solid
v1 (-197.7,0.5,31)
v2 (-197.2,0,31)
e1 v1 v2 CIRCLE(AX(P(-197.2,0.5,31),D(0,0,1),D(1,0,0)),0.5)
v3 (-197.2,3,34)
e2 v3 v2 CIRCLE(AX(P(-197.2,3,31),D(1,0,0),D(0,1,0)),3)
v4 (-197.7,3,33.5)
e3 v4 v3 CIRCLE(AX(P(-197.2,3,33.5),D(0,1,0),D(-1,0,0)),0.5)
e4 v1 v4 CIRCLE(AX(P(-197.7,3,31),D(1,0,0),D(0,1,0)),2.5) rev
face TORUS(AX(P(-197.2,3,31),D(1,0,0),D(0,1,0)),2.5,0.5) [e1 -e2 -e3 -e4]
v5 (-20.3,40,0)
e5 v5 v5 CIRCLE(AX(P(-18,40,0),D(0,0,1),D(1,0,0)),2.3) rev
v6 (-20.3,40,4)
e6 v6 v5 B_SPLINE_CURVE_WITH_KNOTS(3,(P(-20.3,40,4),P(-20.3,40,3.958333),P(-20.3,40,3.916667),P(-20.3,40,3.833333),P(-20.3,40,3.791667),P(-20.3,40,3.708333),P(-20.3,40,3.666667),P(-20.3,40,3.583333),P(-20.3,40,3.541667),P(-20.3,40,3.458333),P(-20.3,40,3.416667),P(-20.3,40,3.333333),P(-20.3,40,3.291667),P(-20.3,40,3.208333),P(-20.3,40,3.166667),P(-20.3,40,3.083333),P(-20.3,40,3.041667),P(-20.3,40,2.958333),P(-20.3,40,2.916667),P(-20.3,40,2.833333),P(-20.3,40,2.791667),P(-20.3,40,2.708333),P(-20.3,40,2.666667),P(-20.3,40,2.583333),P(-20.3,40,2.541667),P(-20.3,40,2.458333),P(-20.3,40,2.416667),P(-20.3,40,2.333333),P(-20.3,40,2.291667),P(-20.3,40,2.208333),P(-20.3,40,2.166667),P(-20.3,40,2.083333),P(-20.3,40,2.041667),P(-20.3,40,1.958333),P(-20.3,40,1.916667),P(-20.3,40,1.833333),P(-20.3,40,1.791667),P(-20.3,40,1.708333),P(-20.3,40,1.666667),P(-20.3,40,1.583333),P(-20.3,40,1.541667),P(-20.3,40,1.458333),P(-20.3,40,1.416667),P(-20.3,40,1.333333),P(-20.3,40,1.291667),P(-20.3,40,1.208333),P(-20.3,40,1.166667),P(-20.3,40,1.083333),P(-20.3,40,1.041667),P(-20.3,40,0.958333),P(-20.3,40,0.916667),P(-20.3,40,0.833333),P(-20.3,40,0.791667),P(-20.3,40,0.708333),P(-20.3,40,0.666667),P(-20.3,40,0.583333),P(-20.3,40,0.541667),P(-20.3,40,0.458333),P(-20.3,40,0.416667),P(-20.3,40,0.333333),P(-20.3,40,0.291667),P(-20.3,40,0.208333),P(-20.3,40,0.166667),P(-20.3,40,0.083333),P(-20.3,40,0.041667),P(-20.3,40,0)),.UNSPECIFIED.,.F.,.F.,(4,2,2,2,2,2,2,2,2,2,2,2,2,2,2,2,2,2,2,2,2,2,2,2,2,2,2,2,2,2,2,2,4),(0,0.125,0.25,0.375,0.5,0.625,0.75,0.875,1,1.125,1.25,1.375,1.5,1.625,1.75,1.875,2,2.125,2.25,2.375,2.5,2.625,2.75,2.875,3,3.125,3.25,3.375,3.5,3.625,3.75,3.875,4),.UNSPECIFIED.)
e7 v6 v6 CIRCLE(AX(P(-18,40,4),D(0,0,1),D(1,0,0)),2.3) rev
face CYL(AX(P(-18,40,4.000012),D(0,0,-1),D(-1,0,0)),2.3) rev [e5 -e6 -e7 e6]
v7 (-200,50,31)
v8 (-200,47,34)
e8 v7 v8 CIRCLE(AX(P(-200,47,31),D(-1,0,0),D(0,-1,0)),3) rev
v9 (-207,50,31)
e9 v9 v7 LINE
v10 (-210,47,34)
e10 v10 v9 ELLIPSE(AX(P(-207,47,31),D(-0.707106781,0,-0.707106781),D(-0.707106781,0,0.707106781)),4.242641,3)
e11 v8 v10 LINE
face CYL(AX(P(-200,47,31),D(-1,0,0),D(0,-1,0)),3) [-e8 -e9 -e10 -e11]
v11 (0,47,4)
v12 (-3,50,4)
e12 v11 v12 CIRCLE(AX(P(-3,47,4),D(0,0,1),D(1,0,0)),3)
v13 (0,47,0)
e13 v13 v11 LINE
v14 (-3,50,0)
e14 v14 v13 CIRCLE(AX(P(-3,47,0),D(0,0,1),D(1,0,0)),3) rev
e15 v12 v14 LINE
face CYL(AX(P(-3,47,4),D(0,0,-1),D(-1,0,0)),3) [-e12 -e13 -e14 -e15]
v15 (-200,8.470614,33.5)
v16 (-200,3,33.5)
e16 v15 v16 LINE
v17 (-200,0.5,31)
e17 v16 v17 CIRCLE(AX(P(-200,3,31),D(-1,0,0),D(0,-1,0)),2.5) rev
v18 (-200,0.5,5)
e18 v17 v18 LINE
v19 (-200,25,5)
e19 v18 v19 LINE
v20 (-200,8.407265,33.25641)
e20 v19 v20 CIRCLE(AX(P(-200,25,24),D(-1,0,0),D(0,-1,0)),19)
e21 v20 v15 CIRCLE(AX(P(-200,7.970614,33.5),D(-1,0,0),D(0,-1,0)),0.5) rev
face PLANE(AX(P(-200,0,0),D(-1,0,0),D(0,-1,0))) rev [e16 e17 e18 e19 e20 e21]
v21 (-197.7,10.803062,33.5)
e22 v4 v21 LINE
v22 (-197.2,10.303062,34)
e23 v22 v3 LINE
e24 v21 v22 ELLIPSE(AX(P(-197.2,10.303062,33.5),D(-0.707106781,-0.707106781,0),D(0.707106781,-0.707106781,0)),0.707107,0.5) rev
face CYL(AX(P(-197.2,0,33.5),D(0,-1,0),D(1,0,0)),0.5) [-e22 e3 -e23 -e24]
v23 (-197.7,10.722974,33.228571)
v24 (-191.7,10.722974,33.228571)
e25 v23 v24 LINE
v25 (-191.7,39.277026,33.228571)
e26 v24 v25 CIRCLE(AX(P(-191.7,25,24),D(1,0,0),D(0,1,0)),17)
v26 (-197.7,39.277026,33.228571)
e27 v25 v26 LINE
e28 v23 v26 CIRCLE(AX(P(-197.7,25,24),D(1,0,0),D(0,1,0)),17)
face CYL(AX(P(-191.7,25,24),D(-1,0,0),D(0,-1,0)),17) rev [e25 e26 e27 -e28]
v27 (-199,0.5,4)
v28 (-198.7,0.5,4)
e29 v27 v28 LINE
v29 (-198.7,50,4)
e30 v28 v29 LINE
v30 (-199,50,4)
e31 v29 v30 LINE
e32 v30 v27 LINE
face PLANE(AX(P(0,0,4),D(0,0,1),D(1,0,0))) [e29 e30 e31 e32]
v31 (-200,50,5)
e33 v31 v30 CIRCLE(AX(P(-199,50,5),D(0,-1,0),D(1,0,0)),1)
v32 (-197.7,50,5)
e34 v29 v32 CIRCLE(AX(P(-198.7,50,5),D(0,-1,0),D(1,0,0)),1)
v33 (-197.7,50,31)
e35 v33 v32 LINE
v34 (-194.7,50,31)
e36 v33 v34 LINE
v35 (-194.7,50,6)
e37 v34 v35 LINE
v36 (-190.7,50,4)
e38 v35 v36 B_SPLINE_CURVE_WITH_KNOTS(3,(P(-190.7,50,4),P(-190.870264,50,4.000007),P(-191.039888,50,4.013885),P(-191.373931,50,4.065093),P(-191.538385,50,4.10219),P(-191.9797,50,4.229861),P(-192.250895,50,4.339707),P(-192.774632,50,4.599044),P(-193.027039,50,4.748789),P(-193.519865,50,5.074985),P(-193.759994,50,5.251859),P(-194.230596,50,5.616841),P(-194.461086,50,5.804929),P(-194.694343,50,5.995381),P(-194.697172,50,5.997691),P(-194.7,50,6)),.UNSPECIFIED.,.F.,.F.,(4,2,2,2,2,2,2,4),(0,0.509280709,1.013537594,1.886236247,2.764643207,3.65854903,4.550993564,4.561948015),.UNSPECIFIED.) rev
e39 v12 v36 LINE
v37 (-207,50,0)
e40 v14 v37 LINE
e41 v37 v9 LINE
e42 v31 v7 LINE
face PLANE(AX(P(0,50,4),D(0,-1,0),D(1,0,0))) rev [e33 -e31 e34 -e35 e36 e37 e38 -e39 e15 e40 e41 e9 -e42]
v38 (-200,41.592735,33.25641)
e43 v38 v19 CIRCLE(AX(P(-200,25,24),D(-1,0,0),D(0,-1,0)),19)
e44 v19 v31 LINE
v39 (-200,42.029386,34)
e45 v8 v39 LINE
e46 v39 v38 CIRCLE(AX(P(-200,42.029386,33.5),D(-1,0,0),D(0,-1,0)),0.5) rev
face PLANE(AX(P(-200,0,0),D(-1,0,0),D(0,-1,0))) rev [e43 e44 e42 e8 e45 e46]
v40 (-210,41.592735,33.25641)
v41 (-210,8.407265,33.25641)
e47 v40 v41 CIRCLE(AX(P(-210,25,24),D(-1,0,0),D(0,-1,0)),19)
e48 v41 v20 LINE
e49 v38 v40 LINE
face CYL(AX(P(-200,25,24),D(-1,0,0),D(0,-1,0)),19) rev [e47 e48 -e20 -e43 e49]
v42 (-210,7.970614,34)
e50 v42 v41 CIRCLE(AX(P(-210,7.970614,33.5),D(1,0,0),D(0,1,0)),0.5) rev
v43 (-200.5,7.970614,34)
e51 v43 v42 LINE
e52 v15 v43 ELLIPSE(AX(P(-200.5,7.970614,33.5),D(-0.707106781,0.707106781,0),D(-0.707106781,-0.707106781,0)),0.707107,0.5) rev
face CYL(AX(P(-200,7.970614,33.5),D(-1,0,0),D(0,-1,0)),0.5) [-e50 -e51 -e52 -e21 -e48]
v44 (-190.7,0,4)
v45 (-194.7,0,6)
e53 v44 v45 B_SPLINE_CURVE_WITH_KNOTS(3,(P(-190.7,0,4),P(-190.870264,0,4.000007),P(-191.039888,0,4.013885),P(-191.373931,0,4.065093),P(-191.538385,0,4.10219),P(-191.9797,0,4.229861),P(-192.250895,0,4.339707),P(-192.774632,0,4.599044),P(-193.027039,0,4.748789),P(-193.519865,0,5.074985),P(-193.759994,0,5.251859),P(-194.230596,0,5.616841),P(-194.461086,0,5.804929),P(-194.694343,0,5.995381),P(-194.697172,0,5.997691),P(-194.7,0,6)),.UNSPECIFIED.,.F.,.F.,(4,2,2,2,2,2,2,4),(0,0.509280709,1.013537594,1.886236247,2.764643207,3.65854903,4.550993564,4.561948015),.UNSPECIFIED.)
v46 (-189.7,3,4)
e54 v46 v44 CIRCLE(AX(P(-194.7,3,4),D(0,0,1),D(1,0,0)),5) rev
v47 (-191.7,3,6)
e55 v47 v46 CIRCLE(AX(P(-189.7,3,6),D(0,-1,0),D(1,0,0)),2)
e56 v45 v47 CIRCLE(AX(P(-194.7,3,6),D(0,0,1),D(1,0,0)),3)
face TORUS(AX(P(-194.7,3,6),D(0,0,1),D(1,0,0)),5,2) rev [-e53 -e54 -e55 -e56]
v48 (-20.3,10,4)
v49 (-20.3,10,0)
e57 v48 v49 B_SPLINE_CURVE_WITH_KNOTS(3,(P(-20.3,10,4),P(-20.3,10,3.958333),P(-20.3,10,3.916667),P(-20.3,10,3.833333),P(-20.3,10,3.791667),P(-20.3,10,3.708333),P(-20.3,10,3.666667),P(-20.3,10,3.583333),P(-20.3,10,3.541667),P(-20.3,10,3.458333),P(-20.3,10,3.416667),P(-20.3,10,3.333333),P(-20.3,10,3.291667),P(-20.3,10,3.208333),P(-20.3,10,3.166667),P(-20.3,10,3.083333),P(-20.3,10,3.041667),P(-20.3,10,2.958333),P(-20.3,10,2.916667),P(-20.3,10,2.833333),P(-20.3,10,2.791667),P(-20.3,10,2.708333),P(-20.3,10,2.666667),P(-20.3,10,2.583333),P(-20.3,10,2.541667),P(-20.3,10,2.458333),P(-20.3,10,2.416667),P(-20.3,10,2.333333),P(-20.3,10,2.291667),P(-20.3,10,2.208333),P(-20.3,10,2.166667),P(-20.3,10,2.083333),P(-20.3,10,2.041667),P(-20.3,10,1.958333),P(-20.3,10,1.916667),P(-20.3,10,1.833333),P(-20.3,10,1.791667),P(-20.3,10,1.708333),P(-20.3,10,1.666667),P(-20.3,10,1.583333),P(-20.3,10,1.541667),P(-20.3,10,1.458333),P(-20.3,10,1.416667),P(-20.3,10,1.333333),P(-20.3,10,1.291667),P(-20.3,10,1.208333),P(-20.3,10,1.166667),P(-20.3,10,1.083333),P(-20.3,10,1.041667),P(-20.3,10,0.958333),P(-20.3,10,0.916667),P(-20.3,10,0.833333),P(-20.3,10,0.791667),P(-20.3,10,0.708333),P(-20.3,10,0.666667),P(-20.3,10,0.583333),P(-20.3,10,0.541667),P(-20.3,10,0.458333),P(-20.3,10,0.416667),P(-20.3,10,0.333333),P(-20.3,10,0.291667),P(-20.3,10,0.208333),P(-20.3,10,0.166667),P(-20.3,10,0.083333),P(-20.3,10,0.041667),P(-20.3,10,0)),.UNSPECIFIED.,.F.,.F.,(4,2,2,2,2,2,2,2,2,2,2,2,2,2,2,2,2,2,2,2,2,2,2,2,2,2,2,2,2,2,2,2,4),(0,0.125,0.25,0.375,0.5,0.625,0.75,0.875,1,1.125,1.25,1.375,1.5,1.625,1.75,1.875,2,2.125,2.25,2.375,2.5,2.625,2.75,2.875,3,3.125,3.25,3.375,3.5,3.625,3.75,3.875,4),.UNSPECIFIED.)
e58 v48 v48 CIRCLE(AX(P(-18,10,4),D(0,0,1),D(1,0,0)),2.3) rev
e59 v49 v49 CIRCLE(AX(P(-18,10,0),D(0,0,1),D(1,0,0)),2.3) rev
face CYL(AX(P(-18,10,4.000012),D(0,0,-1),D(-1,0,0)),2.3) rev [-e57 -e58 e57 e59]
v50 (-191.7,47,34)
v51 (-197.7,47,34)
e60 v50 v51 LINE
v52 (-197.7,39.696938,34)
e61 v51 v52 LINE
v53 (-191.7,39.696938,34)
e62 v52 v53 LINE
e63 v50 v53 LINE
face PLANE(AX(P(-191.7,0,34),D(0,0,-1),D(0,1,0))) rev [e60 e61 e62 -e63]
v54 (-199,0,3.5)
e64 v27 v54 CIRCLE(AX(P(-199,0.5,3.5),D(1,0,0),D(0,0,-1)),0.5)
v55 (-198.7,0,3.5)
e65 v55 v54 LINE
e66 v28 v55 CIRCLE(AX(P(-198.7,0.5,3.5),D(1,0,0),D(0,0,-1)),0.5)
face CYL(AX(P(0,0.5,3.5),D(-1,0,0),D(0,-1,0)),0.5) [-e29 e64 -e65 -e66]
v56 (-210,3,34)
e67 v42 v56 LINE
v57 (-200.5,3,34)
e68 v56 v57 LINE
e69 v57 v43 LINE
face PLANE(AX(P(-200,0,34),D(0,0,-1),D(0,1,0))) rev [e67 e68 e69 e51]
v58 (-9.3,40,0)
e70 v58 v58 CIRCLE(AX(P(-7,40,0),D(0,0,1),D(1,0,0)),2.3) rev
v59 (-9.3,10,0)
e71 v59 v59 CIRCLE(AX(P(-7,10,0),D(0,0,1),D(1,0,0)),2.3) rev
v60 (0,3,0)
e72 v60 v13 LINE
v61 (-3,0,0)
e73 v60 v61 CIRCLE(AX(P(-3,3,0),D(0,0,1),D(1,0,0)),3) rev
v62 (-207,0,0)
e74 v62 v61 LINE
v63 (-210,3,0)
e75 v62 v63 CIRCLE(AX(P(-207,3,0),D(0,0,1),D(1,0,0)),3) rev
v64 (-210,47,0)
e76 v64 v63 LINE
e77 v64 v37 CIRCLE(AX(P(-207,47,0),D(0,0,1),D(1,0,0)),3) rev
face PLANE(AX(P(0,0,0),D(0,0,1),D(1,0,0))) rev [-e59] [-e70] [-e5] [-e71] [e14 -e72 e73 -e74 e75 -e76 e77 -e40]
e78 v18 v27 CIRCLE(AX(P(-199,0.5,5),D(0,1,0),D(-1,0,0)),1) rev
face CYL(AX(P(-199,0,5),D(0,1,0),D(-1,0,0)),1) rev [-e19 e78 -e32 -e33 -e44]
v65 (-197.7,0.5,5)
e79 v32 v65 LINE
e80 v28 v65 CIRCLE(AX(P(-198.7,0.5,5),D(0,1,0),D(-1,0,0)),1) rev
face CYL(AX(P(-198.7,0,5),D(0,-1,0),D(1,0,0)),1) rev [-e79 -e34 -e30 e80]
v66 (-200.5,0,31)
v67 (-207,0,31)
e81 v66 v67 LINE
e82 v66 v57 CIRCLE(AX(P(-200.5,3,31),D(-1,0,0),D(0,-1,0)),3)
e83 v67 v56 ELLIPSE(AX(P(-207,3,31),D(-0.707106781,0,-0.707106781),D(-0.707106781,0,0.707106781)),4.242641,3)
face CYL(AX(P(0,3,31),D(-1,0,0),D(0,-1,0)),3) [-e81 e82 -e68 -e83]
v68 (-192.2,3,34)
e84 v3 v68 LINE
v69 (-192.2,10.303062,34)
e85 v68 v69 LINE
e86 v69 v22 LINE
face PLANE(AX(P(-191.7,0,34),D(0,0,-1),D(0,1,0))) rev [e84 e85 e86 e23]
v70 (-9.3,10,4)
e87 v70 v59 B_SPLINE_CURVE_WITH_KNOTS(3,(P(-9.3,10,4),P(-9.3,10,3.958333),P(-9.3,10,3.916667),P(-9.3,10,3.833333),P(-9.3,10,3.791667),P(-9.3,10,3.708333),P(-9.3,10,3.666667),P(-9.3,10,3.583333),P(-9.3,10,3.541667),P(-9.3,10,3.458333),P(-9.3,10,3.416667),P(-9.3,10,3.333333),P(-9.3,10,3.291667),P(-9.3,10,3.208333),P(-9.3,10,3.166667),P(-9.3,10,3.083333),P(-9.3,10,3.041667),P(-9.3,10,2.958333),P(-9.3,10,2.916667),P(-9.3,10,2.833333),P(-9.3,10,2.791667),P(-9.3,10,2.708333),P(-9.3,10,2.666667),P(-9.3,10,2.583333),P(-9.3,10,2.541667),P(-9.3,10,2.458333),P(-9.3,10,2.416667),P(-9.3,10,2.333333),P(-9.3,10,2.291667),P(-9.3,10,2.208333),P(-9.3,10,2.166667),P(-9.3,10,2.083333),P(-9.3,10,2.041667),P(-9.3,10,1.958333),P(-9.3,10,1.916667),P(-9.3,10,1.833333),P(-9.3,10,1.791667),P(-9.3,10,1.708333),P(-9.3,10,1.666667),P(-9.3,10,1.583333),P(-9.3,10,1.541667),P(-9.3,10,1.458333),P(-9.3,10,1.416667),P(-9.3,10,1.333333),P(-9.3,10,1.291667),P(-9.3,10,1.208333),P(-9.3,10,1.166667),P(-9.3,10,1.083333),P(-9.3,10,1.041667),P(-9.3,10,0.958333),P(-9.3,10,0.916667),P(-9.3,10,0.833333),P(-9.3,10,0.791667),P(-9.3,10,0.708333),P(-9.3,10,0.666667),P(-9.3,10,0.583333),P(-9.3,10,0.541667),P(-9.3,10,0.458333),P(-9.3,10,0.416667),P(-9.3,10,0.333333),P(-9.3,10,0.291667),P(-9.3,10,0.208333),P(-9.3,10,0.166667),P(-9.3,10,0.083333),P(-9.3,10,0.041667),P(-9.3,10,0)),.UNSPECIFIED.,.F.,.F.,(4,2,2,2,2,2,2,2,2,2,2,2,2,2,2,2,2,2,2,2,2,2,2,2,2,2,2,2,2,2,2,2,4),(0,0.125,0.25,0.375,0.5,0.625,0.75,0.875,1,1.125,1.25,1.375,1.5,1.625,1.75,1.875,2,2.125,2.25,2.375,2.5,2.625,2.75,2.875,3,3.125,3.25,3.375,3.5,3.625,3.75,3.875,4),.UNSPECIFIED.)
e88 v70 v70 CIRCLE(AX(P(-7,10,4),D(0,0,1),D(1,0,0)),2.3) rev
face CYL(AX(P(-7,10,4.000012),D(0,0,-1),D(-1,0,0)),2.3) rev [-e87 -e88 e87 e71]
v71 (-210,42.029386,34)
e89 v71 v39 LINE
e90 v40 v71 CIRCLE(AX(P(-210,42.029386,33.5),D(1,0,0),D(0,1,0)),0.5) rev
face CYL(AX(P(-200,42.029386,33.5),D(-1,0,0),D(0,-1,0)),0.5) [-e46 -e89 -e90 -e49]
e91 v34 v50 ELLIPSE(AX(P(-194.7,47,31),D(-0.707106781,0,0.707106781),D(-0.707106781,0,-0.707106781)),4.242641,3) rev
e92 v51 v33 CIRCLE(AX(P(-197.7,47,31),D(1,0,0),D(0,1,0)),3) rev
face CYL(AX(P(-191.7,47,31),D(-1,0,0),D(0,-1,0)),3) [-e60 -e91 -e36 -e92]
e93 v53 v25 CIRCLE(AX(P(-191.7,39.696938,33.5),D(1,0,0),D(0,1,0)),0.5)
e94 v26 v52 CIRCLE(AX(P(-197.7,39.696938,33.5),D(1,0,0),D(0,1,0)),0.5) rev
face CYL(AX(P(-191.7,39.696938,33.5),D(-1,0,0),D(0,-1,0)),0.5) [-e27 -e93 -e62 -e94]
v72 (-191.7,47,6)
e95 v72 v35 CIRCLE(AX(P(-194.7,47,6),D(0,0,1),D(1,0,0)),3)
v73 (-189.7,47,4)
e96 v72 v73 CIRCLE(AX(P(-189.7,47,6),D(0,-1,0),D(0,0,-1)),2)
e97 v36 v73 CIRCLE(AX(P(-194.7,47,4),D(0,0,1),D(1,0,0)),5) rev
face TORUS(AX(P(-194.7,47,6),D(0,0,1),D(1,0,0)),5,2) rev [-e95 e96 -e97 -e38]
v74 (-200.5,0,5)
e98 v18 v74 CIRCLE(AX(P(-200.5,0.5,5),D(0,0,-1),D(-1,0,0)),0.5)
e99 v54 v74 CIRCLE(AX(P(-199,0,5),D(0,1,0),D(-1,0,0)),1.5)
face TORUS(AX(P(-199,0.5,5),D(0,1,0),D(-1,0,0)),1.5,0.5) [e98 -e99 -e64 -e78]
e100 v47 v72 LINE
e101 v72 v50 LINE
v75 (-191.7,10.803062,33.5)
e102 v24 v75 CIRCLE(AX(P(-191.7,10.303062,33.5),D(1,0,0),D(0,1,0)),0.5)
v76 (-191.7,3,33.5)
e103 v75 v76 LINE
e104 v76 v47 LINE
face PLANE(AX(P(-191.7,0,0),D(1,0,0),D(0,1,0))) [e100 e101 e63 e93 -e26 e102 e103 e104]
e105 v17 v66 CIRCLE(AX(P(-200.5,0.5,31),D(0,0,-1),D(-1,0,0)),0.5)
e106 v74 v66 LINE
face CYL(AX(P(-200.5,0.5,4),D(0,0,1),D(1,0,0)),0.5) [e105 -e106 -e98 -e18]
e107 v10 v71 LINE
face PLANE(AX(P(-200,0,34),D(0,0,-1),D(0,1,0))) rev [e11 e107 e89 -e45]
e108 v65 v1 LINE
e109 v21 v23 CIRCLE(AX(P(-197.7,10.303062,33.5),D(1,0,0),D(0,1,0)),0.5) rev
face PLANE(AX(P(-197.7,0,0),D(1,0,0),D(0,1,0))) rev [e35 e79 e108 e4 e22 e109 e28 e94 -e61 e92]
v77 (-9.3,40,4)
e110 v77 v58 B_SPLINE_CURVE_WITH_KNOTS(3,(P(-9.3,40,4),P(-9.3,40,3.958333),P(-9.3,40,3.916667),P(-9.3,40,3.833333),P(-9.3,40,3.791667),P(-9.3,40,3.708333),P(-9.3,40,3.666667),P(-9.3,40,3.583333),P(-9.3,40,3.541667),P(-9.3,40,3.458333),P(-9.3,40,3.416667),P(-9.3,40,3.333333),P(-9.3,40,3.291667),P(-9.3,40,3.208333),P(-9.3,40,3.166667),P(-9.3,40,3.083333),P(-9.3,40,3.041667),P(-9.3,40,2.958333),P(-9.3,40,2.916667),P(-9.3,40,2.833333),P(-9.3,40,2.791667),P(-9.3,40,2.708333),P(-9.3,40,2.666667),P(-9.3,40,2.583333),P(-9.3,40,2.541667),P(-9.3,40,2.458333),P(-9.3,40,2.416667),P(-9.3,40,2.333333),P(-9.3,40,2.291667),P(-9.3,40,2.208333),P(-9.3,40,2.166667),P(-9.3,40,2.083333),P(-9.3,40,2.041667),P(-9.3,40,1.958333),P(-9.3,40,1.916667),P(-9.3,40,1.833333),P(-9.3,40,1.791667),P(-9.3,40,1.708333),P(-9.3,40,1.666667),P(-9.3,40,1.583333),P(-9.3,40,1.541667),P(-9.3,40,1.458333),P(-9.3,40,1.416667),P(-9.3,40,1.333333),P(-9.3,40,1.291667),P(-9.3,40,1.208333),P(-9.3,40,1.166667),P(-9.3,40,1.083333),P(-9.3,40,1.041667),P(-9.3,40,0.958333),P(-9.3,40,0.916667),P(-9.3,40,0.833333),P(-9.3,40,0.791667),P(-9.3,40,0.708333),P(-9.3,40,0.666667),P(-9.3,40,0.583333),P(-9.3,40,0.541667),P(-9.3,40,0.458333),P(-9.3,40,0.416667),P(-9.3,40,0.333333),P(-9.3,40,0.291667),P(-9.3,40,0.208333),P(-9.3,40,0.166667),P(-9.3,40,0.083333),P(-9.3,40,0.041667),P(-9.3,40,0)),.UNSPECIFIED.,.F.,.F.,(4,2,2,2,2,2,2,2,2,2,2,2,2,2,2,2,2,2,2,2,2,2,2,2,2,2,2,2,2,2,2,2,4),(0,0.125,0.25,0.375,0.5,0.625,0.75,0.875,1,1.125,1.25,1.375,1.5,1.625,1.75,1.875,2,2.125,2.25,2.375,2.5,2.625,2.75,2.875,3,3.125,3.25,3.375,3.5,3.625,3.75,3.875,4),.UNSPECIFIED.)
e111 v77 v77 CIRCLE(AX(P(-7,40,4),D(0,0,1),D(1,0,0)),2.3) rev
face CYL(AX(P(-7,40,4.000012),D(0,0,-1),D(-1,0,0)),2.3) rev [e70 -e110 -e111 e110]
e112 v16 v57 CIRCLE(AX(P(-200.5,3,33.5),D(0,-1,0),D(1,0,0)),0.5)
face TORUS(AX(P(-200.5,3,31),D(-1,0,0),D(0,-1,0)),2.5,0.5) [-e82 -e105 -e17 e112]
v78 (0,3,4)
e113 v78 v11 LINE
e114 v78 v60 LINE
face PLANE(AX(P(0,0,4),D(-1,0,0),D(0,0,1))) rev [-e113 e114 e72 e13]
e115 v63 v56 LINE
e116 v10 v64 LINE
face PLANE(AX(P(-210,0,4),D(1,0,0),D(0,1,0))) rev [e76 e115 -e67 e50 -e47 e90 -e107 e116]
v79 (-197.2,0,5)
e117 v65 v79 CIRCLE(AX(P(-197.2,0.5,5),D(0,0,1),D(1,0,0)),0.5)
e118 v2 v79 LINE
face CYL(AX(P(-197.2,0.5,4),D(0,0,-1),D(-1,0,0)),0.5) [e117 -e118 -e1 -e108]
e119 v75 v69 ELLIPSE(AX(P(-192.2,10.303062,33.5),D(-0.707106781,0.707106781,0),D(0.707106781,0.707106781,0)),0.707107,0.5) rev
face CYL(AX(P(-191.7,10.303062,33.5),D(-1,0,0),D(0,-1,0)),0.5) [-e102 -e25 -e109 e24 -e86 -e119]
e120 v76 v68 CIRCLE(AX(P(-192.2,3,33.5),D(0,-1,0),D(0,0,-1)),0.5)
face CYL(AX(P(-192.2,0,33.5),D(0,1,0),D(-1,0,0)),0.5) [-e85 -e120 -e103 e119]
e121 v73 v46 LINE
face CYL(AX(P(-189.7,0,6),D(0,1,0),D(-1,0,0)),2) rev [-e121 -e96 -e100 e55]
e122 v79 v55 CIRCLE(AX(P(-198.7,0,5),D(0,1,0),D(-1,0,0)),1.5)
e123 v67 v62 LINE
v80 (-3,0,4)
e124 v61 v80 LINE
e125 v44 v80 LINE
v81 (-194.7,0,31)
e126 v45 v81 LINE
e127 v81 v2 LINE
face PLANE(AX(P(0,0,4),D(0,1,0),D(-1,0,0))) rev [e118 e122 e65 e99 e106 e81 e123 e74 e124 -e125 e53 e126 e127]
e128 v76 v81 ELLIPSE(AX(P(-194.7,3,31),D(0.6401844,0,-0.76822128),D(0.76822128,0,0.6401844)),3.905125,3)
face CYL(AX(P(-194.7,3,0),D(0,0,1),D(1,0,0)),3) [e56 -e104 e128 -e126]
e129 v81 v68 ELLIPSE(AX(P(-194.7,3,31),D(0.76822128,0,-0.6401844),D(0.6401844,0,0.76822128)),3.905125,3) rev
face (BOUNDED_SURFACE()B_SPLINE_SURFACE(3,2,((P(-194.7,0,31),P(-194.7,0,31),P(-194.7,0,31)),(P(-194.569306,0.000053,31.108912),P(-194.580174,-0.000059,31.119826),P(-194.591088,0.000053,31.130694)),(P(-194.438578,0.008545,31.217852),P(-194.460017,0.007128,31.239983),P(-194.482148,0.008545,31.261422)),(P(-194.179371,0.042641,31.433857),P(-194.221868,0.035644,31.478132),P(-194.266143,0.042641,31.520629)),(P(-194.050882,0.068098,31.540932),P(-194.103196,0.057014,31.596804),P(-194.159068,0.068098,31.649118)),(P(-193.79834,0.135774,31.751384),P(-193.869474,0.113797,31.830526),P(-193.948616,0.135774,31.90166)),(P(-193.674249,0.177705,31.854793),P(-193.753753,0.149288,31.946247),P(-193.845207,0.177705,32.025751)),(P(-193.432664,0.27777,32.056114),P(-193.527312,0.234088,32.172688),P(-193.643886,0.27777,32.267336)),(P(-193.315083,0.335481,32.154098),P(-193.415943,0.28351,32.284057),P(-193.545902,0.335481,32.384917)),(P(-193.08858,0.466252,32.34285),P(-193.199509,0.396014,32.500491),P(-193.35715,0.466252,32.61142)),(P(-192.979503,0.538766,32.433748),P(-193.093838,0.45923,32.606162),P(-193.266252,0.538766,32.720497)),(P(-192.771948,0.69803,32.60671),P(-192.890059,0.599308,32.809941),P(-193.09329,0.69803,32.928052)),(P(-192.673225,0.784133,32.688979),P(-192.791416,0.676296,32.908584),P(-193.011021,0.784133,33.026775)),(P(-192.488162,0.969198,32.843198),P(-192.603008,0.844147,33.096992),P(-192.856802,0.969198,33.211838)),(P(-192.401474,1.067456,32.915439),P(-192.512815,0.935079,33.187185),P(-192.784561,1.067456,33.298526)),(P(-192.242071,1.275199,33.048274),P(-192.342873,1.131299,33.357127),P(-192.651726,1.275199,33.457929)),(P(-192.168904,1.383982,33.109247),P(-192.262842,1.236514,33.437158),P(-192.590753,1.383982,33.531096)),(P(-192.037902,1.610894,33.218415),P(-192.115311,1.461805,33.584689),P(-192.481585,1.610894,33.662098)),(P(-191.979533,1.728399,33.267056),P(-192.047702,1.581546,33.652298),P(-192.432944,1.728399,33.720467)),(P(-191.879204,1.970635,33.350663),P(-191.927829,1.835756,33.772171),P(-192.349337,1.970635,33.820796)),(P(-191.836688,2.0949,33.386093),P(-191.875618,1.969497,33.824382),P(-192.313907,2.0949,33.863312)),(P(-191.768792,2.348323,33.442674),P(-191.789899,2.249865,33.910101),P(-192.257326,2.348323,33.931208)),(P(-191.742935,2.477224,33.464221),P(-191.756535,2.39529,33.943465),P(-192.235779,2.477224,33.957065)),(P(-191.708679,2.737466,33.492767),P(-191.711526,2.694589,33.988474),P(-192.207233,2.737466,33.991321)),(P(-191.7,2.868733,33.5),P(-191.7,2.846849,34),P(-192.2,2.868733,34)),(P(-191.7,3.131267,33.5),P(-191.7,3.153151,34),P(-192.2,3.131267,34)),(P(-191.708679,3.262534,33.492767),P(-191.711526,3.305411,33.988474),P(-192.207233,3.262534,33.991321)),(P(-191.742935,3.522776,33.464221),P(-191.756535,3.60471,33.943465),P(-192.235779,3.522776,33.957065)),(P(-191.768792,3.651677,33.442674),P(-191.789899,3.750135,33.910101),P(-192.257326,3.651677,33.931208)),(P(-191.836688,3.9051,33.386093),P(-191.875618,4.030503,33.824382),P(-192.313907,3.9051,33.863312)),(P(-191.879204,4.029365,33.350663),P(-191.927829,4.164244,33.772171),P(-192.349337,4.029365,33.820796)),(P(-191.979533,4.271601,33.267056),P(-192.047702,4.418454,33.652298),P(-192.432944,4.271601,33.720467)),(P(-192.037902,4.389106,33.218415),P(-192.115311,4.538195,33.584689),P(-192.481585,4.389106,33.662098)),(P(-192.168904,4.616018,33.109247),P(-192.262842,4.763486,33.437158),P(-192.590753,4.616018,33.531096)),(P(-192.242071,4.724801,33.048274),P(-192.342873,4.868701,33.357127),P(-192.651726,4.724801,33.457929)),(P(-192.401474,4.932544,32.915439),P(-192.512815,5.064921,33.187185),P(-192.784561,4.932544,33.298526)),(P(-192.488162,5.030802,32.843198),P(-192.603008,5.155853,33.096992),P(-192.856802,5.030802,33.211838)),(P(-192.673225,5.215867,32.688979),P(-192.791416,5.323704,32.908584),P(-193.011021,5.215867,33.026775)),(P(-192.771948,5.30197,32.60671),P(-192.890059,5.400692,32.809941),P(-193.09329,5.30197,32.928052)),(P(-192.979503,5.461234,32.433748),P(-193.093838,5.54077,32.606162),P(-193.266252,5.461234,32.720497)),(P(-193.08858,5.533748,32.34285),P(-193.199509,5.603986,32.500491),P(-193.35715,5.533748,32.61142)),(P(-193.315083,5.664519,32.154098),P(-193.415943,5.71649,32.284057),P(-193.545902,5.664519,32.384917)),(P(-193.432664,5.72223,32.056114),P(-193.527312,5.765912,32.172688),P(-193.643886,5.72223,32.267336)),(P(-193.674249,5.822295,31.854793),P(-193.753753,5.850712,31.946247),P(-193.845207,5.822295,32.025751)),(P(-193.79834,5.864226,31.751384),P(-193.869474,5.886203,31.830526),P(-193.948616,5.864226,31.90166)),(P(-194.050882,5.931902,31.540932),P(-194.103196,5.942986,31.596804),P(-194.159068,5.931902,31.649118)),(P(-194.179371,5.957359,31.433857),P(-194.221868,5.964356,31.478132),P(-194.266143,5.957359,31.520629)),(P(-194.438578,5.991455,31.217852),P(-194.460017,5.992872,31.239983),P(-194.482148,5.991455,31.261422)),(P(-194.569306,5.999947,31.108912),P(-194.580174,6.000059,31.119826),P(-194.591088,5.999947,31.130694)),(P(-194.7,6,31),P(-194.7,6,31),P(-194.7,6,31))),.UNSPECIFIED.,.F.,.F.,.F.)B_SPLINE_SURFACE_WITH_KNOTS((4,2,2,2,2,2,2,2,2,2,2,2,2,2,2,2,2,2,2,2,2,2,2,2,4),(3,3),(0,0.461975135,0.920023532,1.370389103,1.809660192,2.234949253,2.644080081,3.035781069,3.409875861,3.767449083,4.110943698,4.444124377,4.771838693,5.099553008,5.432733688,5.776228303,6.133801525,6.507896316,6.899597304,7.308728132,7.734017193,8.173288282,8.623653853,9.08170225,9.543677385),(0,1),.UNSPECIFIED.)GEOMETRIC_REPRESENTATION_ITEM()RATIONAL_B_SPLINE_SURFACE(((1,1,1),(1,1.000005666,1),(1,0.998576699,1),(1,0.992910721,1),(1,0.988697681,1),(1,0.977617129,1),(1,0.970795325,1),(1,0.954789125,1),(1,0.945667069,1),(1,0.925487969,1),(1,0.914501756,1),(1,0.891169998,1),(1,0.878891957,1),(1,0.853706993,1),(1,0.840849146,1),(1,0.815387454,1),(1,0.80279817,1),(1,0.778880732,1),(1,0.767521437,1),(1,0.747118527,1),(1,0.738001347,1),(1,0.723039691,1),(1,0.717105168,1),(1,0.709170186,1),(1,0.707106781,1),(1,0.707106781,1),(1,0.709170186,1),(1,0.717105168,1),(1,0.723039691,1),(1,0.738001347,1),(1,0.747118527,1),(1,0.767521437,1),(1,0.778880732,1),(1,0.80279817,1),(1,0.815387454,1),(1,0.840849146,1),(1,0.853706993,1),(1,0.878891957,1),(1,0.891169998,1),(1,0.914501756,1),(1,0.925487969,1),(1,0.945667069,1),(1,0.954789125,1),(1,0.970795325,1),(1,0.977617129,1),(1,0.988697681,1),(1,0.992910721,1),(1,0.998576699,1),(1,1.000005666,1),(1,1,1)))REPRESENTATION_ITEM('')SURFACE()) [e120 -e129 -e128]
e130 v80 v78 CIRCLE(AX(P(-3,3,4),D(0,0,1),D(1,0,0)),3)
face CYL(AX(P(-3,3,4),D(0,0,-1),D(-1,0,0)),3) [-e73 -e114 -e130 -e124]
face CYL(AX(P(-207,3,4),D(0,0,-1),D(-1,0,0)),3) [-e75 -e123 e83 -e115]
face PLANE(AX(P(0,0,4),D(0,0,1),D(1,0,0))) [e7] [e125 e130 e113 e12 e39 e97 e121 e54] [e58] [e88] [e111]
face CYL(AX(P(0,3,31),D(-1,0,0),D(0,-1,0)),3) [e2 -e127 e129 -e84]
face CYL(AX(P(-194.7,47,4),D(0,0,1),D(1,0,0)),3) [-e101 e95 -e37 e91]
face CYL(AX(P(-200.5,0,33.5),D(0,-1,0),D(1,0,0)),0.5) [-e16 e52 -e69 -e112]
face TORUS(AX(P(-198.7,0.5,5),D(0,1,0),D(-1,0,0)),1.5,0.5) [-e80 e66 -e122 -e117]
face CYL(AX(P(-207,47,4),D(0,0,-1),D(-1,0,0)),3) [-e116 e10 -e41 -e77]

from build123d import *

# Parameters (mm, degrees)
SKETCH_1_W                      = 210
SKETCH_1_H                      = 50
EXTRUDE_1_DEPTH                 = 4
CUT_EXTRUDE_1_REACH             = 217.907
SKETCH_4_R                      = 2.3
CUT_EXTRUDE_1_DIRECTION_2_DEPTH = 216.907387553
EXTRUDE_2_DEPTH                 = 10
EXTRUDE_3_DEPTH                 = 6
FILLET_1_R                      = 3
FILLET_2_R                      = 2
FILLET_3_R                      = 1
FILLET_4_R                      = 0.5


# Some blends are built 0.0001 mm under size
with BuildPart() as part:
    # ｽｹｯﾁ1 → ﾎﾞｽ - 押し出し1 (new body)
    with BuildSketch(Plane.XY):
        with Locations((-105, 25)):
            Rectangle(SKETCH_1_W, SKETCH_1_H)
    extrude(amount=EXTRUDE_1_DEPTH)

    # ｽｹｯﾁ4 → ｶｯﾄ - 押し出し1 (cut, up to next)
    with BuildSketch(Plane.XY.offset(4), mode=Mode.PRIVATE) as cut_extrude_1_sk1:
        with Locations(Location((-7, 40, 0), (0, 0, 180))):
            Circle(SKETCH_4_R)
    cut_extrude_1_tool1 = extrude(cut_extrude_1_sk1.sketch, amount=-CUT_EXTRUDE_1_REACH, mode=Mode.PRIVATE) & part.part
    # ｽｹｯﾁ4 → ｶｯﾄ - 押し出し1 (cut, up to next)
    with BuildSketch(Plane.XY.offset(4), mode=Mode.PRIVATE) as cut_extrude_1_sk2:
        with Locations(Location((-18, 40, 0), (0, 0, 180))):
            Circle(SKETCH_4_R)
    cut_extrude_1_tool2 = extrude(cut_extrude_1_sk2.sketch, amount=-CUT_EXTRUDE_1_REACH, mode=Mode.PRIVATE) & part.part
    # ｽｹｯﾁ4 → ｶｯﾄ - 押し出し1 (cut, up to next)
    with BuildSketch(Plane.XY.offset(4), mode=Mode.PRIVATE) as cut_extrude_1_sk3:
        with Locations(Location((-7, 10, 0), (0, 0, 180))):
            Circle(SKETCH_4_R)
    cut_extrude_1_tool3 = extrude(cut_extrude_1_sk3.sketch, amount=-CUT_EXTRUDE_1_REACH, mode=Mode.PRIVATE) & part.part
    # ｽｹｯﾁ4 → ｶｯﾄ - 押し出し1 (cut, up to next)
    with BuildSketch(Plane.XY.offset(4), mode=Mode.PRIVATE) as cut_extrude_1_sk4:
        with Locations(Location((-18, 10, 0), (0, 0, 180))):
            Circle(SKETCH_4_R)
    cut_extrude_1_tool4 = extrude(cut_extrude_1_sk4.sketch, amount=-CUT_EXTRUDE_1_REACH, mode=Mode.PRIVATE) & part.part
    add(cut_extrude_1_tool1.solids().sort_by_distance((-7, 40, 4))[0], mode=Mode.SUBTRACT)
    add(cut_extrude_1_tool2.solids().sort_by_distance((-18, 40, 4))[0], mode=Mode.SUBTRACT)
    add(cut_extrude_1_tool3.solids().sort_by_distance((-7, 10, 4))[0], mode=Mode.SUBTRACT)
    add(cut_extrude_1_tool4.solids().sort_by_distance((-18, 10, 4))[0], mode=Mode.SUBTRACT)

    # ｽｹｯﾁ4 → ｶｯﾄ - 押し出し1 direction 2 (cut)
    with BuildSketch(Plane.XY.offset(4)):
        with Locations(Location((-7, 40, 0), (0, 0, 180))):
            Circle(SKETCH_4_R)
        with Locations(Location((-18, 40, 0), (0, 0, 180))):
            Circle(SKETCH_4_R)
        with Locations(Location((-7, 10, 0), (0, 0, 180))):
            Circle(SKETCH_4_R)
        with Locations(Location((-18, 10, 0), (0, 0, 180))):
            Circle(SKETCH_4_R)
    extrude(amount=CUT_EXTRUDE_1_DIRECTION_2_DEPTH, mode=Mode.SUBTRACT)

    # ｽｹｯﾁ5 → ﾎﾞｽ - 押し出し2 (add)
    with BuildSketch(Plane.ZY.offset(210)):
        with BuildLine():
            Line((34, 50), (4, 50))
            Line((4, 50), (4, 0))
            Line((4, 0), (34, 0))
            Line((34, 0), (34, 8.844505579))
            ThreePointArc((34, 8.844505579), (5, 25), (34, 41.155494421))
            Line((34, 41.155494421), (34, 50))
        make_face()
    extrude(amount=-EXTRUDE_2_DEPTH)

    # ｽｹｯﾁ6 → ﾎﾞｽ - 押し出し3 (add)
    with BuildSketch(Plane(origin=(-197.7, 0, 0), x_dir=(0, 0, -1), z_dir=(1, 0, 0))):
        with BuildLine():
            Line((-4, 50), (-34, 50))
            Line((-34, 50), (-34, 38.747727085))
            ThreePointArc((-34, 38.747727085), (-16.28637569, 40.149257408), (-7, 25))
            ThreePointArc((-7, 25), (-16.28637569, 9.850742592), (-34, 11.252272915))
            Line((-34, 11.252272915), (-34, 0))
            Line((-34, 0), (-4, 0))
            Line((-4, 0), (-4, 50))
        make_face()
    extrude(amount=EXTRUDE_3_DEPTH)

    # ﾌｨﾚｯﾄ1
    fillet_1_edges = [part.edges().sort_by_distance(p)[0] for p in [
        (-205, 0, 34),
        (-205, 50, 34),
        (-194.7, 0, 34),
        (-191.7, 50, 19),
        (-194.7, 50, 34),
        (-191.7, 0, 19),
        (0, 0, 2),
        (-210, 0, 17),
        (-210, 50, 17),
        (0, 50, 2),
    ]]
    fillet(fillet_1_edges, radius=FILLET_1_R)

    # ﾌｨﾚｯﾄ2
    # the kernel refuses this fillet: 2 mm, written as the material it adds along each edge
    with BuildSketch(Plane(origin=(-191.7, 3, 4), x_dir=(0, 0, 1), z_dir=(0, 1, 0))) as fillet_2_piece_1:
        with BuildLine():
            CenterArc((FILLET_2_R, FILLET_2_R), FILLET_2_R, 180, 90)
            Line((0, FILLET_2_R), (0, 0))
            Line((0, 0), (FILLET_2_R, 0))
        make_face()
    extrude(amount=44)
    with BuildSketch(Plane(origin=(-194.7, 3, 4), x_dir=(-0.9953436464450918, 0.0963899656675329, 0), z_dir=(0.0963899656675329, 0.9953436464450918, 0))) as fillet_2_piece_2_section:
        with BuildLine():
            CenterArc((3 + FILLET_2_R, FILLET_2_R), FILLET_2_R, 180, 90)
            Line((3 + FILLET_2_R, 0), (3, 0))
            Line((3, 0), (3, FILLET_2_R))
        make_face()
    fillet_2_piece_2 = revolve(axis=Axis((-194.7, 3, 4), (0, 0, 1)), revolution_arc=185.531326158, mode=Mode.PRIVATE)
    fillet_2_piece_2 = split(fillet_2_piece_2, bisect_by=Plane(origin=(-192.479113514, 0, 4.573600846), z_dir=(0, 1, 0)), keep=Keep.TOP, mode=Mode.PRIVATE)
    fillet_2_piece_2 = split(fillet_2_piece_2, bisect_by=Plane(origin=(-197.7, 0.779113097, 4.573600846), z_dir=(1, 0, 0)), keep=Keep.TOP, mode=Mode.PRIVATE)
    add(fillet_2_piece_2)
    with BuildSketch(Plane(origin=(-194.7, 47, 4), x_dir=(-0.9953436464450918, -0.09638996566753365, 0), z_dir=(0.09638996566753365, -0.9953436464450918, 0))) as fillet_2_piece_3_section:
        with BuildLine():
            CenterArc((3 + FILLET_2_R, -FILLET_2_R), FILLET_2_R, 90, 90)
            Line((3 + FILLET_2_R, 0), (3, 0))
            Line((3, 0), (3, -FILLET_2_R))
        make_face()
    fillet_2_piece_3 = revolve(axis=Axis((-194.7, 47, 4), (0, 0, -1)), revolution_arc=185.531326158, mode=Mode.PRIVATE)
    fillet_2_piece_3 = split(fillet_2_piece_3, bisect_by=Plane(origin=(-192.479113243, 50, 4.573600331), z_dir=(0, -1, 0)), keep=Keep.TOP, mode=Mode.PRIVATE)
    fillet_2_piece_3 = split(fillet_2_piece_3, bisect_by=Plane(origin=(-197.7, 49.22088673, 4.573600331), z_dir=(1, 0, 0)), keep=Keep.TOP, mode=Mode.PRIVATE)
    add(fillet_2_piece_3)

    # ﾌｨﾚｯﾄ3
    fillet_3_edges = [part.edges().sort_by_distance(p)[0] for p in [
        (-200, 25, 4),
        (-197.7, 25, 4),
    ]]
    fillet(fillet_3_edges, radius=FILLET_3_R - 0.0001)  # a hair under: the kernel refuses the full size

    # ﾌｨﾚｯﾄ4
    fillet_4_edges = [part.edges().sort_by_distance(p)[0] for p in [
        (-192.761853278, 0.71011195, 32.938146722),
        (-200, 5.922252789, 34),
        (-200, 0.878679656, 33.121320344),
        (-200, 0, 17.99995),
        (-199.707136071, 0, 4.292863929),
        (-198.85, 0, 4),
        (-197.992863929, 0, 4.292863929),
        (-197.7, 0, 17.99995),
        (-197.7, 0.878679656, 33.121320344),
        (-194.7, 11.252272915, 34),
        (-194.7, 38.747727085, 34),
        (-191.7, 7.126136458, 34),
        (-197.7, 7.126136458, 34),
        (-205, 8.844505579, 34),
        (-205, 41.155494421, 34),
    ]]
    fillet(fillet_4_edges, radius=FILLET_4_R)


solid = part.part
